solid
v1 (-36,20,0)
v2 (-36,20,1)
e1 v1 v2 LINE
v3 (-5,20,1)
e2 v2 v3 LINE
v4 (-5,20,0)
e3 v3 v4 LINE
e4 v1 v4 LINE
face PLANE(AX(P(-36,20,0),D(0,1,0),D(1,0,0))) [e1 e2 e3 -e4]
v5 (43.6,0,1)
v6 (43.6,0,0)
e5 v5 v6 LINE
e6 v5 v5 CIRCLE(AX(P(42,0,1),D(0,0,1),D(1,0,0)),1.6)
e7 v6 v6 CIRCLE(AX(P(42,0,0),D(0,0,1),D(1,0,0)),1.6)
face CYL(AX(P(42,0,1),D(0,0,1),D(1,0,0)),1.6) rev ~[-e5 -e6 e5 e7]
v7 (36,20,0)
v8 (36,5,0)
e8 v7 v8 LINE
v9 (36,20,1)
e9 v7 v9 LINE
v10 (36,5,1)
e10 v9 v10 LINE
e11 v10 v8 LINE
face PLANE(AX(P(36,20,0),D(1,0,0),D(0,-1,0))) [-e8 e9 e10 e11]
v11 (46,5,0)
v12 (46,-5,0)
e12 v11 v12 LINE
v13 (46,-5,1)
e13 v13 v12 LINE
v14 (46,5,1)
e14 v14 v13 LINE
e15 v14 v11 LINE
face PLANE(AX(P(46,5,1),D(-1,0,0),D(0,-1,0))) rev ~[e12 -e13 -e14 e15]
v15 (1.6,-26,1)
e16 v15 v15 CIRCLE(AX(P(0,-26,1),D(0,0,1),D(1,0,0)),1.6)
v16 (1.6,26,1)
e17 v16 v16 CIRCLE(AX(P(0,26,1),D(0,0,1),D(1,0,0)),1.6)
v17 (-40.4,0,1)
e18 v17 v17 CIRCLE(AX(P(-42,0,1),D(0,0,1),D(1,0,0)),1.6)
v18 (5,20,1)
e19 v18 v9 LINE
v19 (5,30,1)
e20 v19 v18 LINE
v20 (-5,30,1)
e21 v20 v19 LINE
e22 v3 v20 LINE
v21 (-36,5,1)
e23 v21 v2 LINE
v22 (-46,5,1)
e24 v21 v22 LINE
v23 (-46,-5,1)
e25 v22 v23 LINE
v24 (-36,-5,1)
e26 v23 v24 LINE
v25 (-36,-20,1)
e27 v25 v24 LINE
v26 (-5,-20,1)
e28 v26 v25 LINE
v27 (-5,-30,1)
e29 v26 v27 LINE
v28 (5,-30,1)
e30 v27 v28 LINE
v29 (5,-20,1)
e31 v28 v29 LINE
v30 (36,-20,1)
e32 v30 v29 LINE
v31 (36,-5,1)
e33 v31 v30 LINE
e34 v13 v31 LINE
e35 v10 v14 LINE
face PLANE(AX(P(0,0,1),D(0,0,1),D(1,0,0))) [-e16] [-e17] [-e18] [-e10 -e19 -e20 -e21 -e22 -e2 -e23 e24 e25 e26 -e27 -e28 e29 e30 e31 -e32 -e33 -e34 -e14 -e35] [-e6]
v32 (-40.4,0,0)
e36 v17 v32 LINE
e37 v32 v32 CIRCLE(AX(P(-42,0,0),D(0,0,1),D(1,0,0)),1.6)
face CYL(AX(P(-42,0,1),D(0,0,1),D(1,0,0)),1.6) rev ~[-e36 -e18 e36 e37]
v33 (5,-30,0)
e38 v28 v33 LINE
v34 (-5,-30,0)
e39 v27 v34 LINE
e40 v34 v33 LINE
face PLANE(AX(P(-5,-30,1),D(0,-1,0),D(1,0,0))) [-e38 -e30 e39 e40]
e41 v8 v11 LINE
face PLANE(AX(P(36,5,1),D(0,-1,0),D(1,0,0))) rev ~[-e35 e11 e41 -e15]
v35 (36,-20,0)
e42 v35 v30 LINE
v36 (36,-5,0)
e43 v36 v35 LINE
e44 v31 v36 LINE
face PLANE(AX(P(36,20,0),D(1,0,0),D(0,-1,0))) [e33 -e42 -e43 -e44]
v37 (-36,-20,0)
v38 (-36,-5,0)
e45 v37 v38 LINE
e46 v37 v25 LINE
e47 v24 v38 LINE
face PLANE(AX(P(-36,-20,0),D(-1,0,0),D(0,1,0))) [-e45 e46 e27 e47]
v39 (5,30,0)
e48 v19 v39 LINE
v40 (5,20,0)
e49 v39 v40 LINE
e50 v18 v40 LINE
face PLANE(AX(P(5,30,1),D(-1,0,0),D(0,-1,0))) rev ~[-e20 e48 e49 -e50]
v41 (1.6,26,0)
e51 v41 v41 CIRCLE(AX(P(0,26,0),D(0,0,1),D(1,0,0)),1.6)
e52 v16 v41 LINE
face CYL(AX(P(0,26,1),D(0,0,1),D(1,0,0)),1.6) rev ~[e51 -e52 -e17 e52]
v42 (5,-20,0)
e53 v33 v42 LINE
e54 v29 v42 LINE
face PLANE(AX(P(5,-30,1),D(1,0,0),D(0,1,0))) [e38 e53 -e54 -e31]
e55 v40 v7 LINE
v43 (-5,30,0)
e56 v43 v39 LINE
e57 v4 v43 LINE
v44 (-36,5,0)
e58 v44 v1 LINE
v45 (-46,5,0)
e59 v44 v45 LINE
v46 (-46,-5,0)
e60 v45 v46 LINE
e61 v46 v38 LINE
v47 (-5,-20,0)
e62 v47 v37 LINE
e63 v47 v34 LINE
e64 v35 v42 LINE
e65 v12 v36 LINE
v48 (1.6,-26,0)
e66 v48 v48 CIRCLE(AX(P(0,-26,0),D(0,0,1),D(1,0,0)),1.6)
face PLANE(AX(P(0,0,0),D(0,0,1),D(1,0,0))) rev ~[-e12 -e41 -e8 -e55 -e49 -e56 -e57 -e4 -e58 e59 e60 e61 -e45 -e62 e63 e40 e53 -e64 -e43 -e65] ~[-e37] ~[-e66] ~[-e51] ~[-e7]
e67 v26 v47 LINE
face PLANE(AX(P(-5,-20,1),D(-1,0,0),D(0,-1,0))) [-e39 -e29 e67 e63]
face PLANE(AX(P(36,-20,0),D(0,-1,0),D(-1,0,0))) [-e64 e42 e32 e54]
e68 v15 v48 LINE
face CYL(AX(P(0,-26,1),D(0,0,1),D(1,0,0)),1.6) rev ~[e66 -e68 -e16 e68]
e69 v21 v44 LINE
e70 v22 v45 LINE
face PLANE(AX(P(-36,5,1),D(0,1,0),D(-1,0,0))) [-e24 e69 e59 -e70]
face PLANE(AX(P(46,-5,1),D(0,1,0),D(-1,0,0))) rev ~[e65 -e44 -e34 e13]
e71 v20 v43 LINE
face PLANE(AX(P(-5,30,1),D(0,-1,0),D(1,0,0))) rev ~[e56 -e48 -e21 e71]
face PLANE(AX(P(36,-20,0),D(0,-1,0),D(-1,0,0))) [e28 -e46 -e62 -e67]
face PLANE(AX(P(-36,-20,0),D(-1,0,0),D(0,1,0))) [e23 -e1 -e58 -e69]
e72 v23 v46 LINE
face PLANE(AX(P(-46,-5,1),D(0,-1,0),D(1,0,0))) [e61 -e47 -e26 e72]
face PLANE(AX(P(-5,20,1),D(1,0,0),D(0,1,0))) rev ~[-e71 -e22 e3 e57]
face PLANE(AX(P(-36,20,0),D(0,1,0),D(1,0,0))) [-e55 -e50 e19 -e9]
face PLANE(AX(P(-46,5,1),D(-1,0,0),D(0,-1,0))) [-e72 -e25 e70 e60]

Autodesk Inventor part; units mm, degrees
ref_plane "YZ Plane" through (0, 0, 0) normal (1, 0, 0) x (0, 1, 0)
ref_plane "XZ Plane" through (0, 0, 0) normal (0, 1, 0) x (-1, 0, 0)
ref_plane "XY Plane" through (0, 0, 0) normal (0, 0, 1) x (1, 0, 0)
sketch "Sketch1" plane through (0, 0, 0) normal (0, 0, 1) x (1, 0, 0)
  line L0 (-36, 20) -> (36, 20)
  line L1 (36, 20) -> (36, -20)
  line L2 (36, -20) -> (-36, -20)
  line L3 (-36, -20) -> (-36, 20)
  line L4 (-36, 20) -> (36, -20) construction
  line L5 (36, 20) -> (-36, -20) construction
  point P0 (0, 0)
  dimension "d0" = 40
  dimension "d1" = 72
sketch "Sketch2" plane through (0, 0, 1) normal (0, 0, 1) x (1, 0, 0)
  line L0 (-36, 20) -> (36, 20)
  line L1 (-46, -5) -> (-36, -5)
  line L2 (-36, -5) -> (-36, 5)
  line L3 (-36, 5) -> (-46, 5)
  line L4 (-46, 5) -> (-46, -5)
  line L5 (-46, -5) -> (-36, 5) construction
  line L6 (-36, -5) -> (-46, 5) construction
  line L7 (0, 0) -> (0, 7.0571)
  line L8 (0, 0) -> (6.6312, 0)
  line L9 (-36, -20) -> (-36, 20)
  line L10 (46, -5) -> (36, -5)
  line L11 (36, -5) -> (36, 5)
  line L12 (36, 5) -> (46, 5)
  line L13 (46, 5) -> (46, -5)
  line L14 (46, -5) -> (36, 5) construction
  line L15 (36, -5) -> (46, 5) construction
  circle A0 centre (-42, 0) radius 1.6
  circle A1 centre (42, 0) radius 1.6
  line L16 (36, -20) -> (-36, -20)
  line L17 (-5, -30) -> (5, -30)
  line L18 (5, -30) -> (5, -20)
  line L19 (5, -20) -> (-5, -20)
  line L20 (-5, -20) -> (-5, -30)
  line L21 (-5, -30) -> (5, -20) construction
  line L22 (5, -30) -> (-5, -20) construction
  circle A2 centre (0, -26) radius 1.6
  line L23 (-5, 30) -> (5, 30)
  line L24 (5, 30) -> (5, 20)
  line L25 (5, 20) -> (-5, 20)
  line L26 (-5, 20) -> (-5, 30)
  line L27 (-5, 30) -> (5, 20) construction
  line L28 (5, 30) -> (-5, 20) construction
  circle A3 centre (0, 26) radius 1.6
  point P0 (-41, 0)
  point P1 (41, 0)
  point P2 (0, -25)
  point P3 (0, 25)
  dimension "d5" = 10
  dimension "d6" = 10
  dimension "d10" = 3.2
  dimension "d12" = 4
  dimension "d18" = 3.2
  dimension "d19" = 10
  dimension "d20" = 10
  dimension "d21" = 4
extrude "Plate1" add sketch "Sketch1" along normal blind 1
sheet face with bend "Face2" sketch "Sketch2" thickness 1 toward (0, 0, -1) bend radius 1
bend "Bend1"
equation "\"d2\" = 厚度"
equation "\"d13\" = 折彎半徑"
equation "\"d14\" = 折彎離隙寬度"
equation "\"d16\" = 最小剩餘"
equation "\"d15\" = 折彎離隙深度"
equation "\"d17\" = 轉移半徑"
equation "\"折彎半徑\" = 厚度"
equation "\"折彎離隙寬度\" = 厚度"
equation "\"折彎離隙深度\" = 0.5 * 厚度"
equation "\"轉角離隙大小\" = 4 * 厚度"
equation "\"最小剩餘\" = 2 * 厚度"
equation "\"轉移半徑\" = 折彎半徑"
equation "\"Jacobi半徑大小\" = 折彎半徑"
equation "\"間隙大小\" = 厚度"
equation "\"厚度\" = 1"
properties part number "battery_box_5V_base" material "Aluminum"
